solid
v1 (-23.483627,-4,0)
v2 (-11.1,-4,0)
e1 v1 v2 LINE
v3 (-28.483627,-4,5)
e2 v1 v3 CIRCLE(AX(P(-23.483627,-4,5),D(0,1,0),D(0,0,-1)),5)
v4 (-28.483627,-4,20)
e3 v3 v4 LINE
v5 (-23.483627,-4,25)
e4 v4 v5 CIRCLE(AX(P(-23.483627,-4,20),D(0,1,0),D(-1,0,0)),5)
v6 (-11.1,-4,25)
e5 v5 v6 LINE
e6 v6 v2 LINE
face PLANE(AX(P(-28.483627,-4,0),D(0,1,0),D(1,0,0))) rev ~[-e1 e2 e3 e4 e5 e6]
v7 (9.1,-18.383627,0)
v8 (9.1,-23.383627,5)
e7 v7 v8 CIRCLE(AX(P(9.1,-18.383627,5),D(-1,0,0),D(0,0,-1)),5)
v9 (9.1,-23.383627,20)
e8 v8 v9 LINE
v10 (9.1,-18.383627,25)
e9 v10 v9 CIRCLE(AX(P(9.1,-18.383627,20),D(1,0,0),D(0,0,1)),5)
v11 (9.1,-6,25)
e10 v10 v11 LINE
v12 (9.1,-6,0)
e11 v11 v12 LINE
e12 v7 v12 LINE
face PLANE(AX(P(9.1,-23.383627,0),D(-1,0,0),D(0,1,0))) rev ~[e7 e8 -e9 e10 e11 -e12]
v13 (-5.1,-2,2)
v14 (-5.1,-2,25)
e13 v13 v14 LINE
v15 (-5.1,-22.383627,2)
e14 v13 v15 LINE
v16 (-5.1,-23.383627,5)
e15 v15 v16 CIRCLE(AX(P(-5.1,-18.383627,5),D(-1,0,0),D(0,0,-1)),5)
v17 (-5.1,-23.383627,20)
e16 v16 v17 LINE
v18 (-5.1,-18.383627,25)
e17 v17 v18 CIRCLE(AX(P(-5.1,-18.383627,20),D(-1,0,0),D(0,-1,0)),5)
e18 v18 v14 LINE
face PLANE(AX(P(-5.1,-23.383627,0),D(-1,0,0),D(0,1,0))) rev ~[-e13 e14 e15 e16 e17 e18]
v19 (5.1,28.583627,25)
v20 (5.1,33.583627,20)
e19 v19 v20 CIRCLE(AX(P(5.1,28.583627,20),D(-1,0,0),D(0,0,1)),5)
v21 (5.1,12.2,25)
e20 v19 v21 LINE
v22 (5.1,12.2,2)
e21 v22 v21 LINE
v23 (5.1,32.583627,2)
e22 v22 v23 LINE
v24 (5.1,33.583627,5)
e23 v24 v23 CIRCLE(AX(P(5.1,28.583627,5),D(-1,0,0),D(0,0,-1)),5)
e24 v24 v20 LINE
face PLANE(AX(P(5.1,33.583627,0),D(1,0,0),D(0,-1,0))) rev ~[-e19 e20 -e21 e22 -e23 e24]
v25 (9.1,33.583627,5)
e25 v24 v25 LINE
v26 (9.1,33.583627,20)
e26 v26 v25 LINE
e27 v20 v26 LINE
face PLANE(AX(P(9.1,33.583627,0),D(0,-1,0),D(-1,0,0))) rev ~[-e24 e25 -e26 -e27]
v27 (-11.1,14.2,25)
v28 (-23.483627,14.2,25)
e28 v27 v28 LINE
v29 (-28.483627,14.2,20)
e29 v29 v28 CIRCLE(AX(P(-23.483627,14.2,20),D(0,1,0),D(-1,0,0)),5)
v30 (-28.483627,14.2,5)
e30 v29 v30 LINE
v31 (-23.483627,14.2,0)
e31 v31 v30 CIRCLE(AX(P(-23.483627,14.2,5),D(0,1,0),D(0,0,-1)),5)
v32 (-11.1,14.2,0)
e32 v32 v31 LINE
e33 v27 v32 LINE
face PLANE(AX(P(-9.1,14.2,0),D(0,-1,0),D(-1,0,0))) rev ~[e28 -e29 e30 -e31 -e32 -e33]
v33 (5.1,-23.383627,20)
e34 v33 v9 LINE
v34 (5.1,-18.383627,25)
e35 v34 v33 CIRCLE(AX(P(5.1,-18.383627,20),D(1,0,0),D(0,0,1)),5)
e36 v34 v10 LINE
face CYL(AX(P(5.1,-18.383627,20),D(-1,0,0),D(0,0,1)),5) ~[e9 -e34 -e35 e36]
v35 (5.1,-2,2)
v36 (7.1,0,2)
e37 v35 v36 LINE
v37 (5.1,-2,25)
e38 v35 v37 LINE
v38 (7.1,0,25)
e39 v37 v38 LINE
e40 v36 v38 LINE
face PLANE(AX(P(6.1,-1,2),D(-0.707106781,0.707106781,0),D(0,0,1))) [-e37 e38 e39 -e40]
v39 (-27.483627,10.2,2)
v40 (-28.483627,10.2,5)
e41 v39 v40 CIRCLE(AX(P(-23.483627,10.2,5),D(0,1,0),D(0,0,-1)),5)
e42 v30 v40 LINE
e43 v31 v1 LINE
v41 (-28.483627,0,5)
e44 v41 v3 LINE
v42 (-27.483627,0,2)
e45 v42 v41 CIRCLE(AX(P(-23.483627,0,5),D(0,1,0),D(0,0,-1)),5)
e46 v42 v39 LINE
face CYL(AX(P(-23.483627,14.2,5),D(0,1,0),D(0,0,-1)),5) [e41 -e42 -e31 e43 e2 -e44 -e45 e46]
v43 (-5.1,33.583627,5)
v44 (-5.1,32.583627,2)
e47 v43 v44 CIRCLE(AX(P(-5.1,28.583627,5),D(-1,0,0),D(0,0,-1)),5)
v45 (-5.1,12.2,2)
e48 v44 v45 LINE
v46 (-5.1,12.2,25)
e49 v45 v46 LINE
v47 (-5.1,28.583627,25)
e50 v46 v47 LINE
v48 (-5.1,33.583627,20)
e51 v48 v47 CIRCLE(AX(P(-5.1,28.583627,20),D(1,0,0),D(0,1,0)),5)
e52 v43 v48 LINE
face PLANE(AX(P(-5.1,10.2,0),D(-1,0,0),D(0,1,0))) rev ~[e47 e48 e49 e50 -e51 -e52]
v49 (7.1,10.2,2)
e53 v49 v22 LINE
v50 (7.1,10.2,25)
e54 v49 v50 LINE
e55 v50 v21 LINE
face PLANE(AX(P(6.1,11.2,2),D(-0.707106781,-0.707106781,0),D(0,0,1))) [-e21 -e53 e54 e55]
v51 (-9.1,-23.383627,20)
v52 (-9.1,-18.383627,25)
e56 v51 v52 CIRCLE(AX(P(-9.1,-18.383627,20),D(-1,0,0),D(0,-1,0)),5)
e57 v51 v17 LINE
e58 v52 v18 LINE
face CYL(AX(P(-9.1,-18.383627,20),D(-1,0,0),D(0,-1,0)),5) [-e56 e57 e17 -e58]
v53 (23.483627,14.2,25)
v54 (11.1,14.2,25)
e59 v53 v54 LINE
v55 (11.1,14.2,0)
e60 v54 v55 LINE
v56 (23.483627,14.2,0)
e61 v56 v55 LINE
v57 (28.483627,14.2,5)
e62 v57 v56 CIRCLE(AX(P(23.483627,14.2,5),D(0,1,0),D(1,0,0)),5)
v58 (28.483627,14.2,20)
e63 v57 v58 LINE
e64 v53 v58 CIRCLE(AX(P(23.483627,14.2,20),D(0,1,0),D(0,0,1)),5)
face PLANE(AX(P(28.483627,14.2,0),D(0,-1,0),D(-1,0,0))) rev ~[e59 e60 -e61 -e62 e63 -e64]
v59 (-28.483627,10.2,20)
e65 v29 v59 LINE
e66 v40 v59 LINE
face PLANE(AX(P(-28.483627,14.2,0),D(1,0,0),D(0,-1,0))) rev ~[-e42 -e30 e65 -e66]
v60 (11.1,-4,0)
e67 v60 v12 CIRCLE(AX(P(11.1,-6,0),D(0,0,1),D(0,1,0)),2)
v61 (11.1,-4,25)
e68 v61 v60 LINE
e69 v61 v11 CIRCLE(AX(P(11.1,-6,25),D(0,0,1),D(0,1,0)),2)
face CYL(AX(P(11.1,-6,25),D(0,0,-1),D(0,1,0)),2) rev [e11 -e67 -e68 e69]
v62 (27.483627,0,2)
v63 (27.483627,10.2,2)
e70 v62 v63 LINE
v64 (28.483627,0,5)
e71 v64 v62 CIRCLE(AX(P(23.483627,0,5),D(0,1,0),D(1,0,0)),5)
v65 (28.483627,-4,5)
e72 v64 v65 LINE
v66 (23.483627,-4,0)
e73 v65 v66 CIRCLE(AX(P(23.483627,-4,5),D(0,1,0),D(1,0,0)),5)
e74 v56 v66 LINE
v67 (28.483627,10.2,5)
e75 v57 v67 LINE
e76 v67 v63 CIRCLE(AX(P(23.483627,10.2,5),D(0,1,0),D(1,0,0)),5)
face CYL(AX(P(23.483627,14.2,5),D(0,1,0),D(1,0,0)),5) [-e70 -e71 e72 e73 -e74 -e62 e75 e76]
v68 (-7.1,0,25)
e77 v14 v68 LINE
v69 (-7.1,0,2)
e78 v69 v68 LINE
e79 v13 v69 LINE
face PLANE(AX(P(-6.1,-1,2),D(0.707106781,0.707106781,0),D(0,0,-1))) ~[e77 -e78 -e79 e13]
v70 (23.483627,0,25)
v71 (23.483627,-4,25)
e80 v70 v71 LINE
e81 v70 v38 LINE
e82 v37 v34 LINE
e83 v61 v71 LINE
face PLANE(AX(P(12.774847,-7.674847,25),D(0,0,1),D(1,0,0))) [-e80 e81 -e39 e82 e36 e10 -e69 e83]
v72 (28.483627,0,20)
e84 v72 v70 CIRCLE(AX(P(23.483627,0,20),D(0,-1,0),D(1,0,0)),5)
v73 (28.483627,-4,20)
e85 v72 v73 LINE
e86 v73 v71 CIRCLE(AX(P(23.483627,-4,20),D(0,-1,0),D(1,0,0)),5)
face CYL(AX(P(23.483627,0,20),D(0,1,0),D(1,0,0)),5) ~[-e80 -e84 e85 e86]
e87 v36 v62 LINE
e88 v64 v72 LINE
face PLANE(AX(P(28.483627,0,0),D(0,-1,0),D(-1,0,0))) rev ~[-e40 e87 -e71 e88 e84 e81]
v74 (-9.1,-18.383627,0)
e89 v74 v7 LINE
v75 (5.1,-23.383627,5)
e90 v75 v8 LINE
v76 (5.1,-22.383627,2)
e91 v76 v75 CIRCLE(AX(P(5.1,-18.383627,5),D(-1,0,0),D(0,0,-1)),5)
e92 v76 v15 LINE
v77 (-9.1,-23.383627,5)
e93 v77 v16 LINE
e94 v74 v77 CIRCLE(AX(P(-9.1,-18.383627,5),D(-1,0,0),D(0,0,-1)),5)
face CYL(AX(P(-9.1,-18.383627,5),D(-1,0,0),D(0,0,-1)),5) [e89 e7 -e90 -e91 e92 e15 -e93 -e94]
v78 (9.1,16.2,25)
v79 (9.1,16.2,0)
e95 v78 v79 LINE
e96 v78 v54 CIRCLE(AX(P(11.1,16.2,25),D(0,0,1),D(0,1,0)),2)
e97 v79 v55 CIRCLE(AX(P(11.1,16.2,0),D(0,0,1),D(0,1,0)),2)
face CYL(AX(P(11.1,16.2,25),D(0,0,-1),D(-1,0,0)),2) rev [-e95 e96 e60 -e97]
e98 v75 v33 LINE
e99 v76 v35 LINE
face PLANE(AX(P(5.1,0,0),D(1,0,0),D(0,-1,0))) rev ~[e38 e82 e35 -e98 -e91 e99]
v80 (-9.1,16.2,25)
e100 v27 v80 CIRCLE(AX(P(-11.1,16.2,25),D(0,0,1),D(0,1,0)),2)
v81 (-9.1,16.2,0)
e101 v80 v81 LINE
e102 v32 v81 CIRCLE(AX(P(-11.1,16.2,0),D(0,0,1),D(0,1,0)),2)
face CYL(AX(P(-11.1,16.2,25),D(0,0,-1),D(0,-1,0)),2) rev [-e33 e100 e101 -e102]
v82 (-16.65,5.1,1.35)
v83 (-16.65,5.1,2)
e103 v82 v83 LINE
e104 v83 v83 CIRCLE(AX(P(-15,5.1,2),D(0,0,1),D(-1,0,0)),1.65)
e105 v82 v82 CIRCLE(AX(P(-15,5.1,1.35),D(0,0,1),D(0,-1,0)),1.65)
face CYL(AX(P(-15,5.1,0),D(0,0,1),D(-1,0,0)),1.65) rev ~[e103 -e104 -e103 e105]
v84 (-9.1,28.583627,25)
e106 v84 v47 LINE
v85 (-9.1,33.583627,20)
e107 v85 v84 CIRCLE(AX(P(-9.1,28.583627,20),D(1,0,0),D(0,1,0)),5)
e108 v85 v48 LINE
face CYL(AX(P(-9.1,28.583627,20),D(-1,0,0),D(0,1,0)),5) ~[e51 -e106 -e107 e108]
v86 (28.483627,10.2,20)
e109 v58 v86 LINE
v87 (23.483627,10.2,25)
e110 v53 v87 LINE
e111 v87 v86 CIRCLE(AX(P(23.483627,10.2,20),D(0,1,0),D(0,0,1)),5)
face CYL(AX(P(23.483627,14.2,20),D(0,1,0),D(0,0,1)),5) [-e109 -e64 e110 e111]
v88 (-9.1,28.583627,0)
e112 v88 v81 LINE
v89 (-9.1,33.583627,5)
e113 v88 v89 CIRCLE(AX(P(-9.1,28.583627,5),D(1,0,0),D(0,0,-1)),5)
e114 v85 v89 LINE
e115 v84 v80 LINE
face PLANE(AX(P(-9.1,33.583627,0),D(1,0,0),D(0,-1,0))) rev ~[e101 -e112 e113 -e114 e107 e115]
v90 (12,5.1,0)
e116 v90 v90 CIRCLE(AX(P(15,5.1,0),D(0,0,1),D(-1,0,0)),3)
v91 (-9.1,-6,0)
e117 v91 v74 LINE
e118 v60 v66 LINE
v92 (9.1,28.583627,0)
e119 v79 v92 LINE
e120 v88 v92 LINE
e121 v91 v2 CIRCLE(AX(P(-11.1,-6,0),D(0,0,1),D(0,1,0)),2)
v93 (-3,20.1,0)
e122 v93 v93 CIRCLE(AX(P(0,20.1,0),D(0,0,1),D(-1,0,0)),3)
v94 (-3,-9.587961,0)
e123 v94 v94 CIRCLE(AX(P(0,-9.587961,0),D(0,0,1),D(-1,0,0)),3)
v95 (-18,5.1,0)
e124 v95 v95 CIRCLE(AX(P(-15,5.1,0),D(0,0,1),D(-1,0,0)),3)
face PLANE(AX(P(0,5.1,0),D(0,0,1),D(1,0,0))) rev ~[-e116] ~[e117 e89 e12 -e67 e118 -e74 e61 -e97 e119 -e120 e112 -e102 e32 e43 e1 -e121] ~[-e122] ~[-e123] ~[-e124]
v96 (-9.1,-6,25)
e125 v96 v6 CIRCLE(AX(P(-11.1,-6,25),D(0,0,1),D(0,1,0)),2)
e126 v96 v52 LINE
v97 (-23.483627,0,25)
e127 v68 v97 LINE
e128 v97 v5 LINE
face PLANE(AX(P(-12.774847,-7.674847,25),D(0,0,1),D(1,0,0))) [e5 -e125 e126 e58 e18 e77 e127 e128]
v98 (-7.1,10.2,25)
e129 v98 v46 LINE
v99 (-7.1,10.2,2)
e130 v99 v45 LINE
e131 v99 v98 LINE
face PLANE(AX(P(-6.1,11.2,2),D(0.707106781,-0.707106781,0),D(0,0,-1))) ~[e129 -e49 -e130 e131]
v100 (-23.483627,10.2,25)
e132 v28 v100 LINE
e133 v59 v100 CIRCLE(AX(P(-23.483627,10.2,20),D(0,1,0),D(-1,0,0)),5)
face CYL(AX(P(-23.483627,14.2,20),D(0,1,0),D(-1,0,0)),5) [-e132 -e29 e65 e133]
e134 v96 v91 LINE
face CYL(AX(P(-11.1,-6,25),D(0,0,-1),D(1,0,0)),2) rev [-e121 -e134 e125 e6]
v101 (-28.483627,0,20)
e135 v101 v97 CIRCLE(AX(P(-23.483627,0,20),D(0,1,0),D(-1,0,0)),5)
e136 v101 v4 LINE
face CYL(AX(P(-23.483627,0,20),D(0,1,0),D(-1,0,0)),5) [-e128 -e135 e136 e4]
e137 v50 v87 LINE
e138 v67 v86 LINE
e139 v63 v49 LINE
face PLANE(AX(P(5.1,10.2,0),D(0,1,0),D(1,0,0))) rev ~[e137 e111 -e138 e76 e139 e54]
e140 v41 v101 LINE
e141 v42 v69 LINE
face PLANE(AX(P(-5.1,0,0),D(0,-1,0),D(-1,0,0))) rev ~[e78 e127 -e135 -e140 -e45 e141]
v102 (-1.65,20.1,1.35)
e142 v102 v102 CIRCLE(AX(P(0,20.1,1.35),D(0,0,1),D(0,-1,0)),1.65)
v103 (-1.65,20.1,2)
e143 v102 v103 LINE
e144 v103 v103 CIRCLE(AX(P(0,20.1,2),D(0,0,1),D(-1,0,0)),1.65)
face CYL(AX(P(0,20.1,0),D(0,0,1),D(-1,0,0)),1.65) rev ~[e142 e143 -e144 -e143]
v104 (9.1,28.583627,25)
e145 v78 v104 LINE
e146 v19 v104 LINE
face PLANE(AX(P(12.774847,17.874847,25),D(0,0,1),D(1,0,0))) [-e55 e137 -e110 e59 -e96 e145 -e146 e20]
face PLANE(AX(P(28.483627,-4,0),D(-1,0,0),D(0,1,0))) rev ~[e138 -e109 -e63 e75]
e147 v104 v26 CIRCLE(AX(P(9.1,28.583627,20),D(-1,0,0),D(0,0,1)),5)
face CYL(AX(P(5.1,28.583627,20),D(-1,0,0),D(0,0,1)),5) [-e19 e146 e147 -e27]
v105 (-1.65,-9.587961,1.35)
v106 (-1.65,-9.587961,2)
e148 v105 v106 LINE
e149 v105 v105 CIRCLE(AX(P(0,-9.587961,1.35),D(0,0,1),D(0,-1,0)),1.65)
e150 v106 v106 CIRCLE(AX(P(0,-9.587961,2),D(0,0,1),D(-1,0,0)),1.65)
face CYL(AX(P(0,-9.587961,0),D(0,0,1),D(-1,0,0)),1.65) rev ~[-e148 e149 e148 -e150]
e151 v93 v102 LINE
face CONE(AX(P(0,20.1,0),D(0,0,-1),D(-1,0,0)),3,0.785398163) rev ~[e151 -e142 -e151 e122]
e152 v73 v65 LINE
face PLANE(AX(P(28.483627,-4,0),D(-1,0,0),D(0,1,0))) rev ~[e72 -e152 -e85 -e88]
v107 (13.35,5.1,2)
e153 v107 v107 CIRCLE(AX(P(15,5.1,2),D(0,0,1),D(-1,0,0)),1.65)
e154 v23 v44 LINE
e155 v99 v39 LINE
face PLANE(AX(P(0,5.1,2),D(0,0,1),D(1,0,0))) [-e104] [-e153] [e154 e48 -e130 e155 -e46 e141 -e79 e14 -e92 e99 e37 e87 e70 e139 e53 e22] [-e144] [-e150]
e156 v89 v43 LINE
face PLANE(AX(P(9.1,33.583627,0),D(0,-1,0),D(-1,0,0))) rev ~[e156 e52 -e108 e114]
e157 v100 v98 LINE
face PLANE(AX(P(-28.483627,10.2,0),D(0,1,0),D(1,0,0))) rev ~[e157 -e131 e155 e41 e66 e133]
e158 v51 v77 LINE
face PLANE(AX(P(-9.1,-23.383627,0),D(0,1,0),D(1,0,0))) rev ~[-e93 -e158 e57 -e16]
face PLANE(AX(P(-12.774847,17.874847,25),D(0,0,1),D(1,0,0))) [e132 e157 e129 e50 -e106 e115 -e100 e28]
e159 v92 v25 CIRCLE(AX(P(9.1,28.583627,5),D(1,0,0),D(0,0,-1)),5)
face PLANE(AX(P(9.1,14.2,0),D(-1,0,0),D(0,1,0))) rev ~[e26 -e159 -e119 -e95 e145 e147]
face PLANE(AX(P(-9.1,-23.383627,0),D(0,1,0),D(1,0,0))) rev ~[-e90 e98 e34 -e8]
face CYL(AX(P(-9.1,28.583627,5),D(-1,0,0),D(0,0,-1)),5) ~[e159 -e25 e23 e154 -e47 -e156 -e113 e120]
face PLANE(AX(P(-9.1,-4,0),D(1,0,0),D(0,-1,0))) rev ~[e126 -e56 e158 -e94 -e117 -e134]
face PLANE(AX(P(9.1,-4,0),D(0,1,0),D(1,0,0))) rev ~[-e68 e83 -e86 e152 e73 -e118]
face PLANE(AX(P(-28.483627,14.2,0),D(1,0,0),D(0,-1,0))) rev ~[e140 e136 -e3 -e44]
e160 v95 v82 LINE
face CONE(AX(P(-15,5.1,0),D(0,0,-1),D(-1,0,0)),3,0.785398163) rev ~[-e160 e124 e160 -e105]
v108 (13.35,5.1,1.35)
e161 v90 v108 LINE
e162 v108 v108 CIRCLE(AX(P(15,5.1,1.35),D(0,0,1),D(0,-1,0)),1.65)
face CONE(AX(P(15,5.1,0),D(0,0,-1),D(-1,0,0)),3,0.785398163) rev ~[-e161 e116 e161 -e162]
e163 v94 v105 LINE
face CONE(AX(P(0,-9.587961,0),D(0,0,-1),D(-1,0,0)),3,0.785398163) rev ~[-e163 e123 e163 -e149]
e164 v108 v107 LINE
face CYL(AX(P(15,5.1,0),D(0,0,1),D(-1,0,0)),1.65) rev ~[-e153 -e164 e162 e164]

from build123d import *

# Parameters (mm, degrees)
F1_DEPTH       = 2
F2_DEPTH       = 25
F3_R           = 2
F4_T1_DEPTH    = 4
F4_T3_DEPTH    = 4
F4_T5_DEPTH    = 4
F4_T7_DEPTH    = 18.2
F4_T9_DEPTH    = 18.2
F4_T11_DEPTH   = 4
F5_R           = 2
F6_SIZE        = 2
F8_D           = 3.3
F8_CSINK_D     = 6
F8_CSINK_ANGLE = 90


# Not quite as in the source:
# - a fillet or chamfer that OpenCascade refuses, or shapes differently, is made with other operations: its cross-section is extruded or revolved along the edge and cut away or added
# - a feature names something its author has since deleted; it is built from what else it names


with BuildPart() as f1:
    # F0 (on Top) → F1 (new body)
    with BuildSketch(Plane.XY):
        Polygon((28.4836267311, 0), (28.4836267311, 10.2), (5.1, 10.2), (5.1, 33.5836267311), (-5.1, 33.5836267311), (-5.1, 10.2), (-28.4836267311, 10.2), (-28.4836267311, 0), (-5.1, 0), (-5.1, -23.3836267311), (5.1, -23.3836267311), (5.1, 0), align=None)
        Polygon((5.1, 10.2), (28.4836267311, 10.2), (28.4836267311, 14.2), (9.1, 14.2), (9.1, 33.5836267311), (5.1, 33.5836267311), align=None)
        Polygon((28.4836267311, -4), (28.4836267311, 0), (5.1, 0), (5.1, -23.3836267311), (9.1, -23.3836267311), (9.1, -4), align=None)
        Polygon((-5.1, 10.2), (-5.1, 33.5836267311), (-9.1, 33.5836267311), (-9.1, 14.2), (-28.4836267311, 14.2), (-28.4836267311, 10.2), align=None)
        Polygon((-9.1, -23.3836267311), (-5.1, -23.3836267311), (-5.1, 0), (-28.4836267311, 0), (-28.4836267311, -4), (-9.1, -4), align=None)
    extrude(amount=F1_DEPTH)

    # F0 (on Top) → F2 (join)
    with BuildSketch(Plane.XY):
        Polygon((-5.1, 10.2), (-5.1, 33.5836267311), (-9.1, 33.5836267311), (-9.1, 14.2), (-28.4836267311, 14.2), (-28.4836267311, 10.2), align=None)
        Polygon((5.1, 10.2), (28.4836267311, 10.2), (28.4836267311, 14.2), (9.1, 14.2), (9.1, 33.5836267311), (5.1, 33.5836267311), align=None)
        Polygon((-9.1, -23.3836267311), (-5.1, -23.3836267311), (-5.1, 0), (-28.4836267311, 0), (-28.4836267311, -4), (-9.1, -4), align=None)
        Polygon((28.4836267311, -4), (28.4836267311, 0), (5.1, 0), (5.1, -23.3836267311), (9.1, -23.3836267311), (9.1, -4), align=None)
    extrude(amount=F2_DEPTH)

    # F3
    f3_edges = [f1.edges().sort_by_distance(p)[0] for p in [
        (9.1, 14.2, 12.5),
        (9.1, -4, 12.5),
    ]]
    fillet(f3_edges, radius=F3_R)

    # F4: fillet of radius 5 on 12 edges, made by hand

    # F4_s2 → F4_t1 (cut)
    with BuildSketch(Plane.XZ.offset(-14.2)):
        with BuildLine():
            ThreePointArc((23.4836267311, 25), (27.0191606371, 23.5355339059), (28.4836267311, 20))
            Line((28.4836267311, 20), (28.5836267311, 20))
            Line((28.5836267311, 20), (28.5836267311, 25.1))
            Line((28.5836267311, 25.1), (23.4836267311, 25.1))
            Line((23.4836267311, 25.1), (23.4836267311, 25))
        make_face()
        with BuildLine():
            ThreePointArc((-28.4836267311, 20), (-27.0191606371, 23.5355339059), (-23.4836267311, 25))
            Line((-23.4836267311, 25), (-23.4836267311, 25.1))
            Line((-23.4836267311, 25.1), (-28.5836267311, 25.1))
            Line((-28.5836267311, 25.1), (-28.5836267311, 20))
            Line((-28.5836267311, 20), (-28.4836267311, 20))
        make_face()
    extrude(amount=F4_T1_DEPTH, mode=Mode.SUBTRACT)

    # F4_s4 → F4_t3 (cut)
    with BuildSketch(Plane.YZ.offset(-9.1)):
        with BuildLine():
            ThreePointArc((33.5836267311, 20), (32.1191606371, 23.5355339059), (28.5836267311, 25))
            Line((28.5836267311, 25), (28.5836267311, 25.1))
            Line((28.5836267311, 25.1), (33.6836267311, 25.1))
            Line((33.6836267311, 25.1), (33.6836267311, 20))
            Line((33.6836267311, 20), (33.5836267311, 20))
        make_face()
        with BuildLine():
            ThreePointArc((-23.3836267311, 20), (-21.9191606371, 23.5355339059), (-18.3836267311, 25))
            Line((-18.3836267311, 25), (-18.3836267311, 25.1))
            Line((-18.3836267311, 25.1), (-23.4836267311, 25.1))
            Line((-23.4836267311, 25.1), (-23.4836267311, 20))
            Line((-23.4836267311, 20), (-23.3836267311, 20))
        make_face()
    extrude(amount=F4_T3_DEPTH, mode=Mode.SUBTRACT)

    # F4_s6 → F4_t5 (cut)
    with BuildSketch(Plane.YZ.offset(5.1)):
        with BuildLine():
            ThreePointArc((28.5836267311, 25), (32.1191606371, 23.5355339059), (33.5836267311, 20))
            Line((33.5836267311, 20), (33.6836267311, 20))
            Line((33.6836267311, 20), (33.6836267311, 25.1))
            Line((33.6836267311, 25.1), (28.5836267311, 25.1))
            Line((28.5836267311, 25.1), (28.5836267311, 25))
        make_face()
        with BuildLine():
            ThreePointArc((-18.3836267311, 25), (-21.9191606371, 23.5355339059), (-23.3836267311, 20))
            Line((-23.3836267311, 20), (-23.4836267311, 20))
            Line((-23.4836267311, 20), (-23.4836267311, 25.1))
            Line((-23.4836267311, 25.1), (-18.3836267311, 25.1))
            Line((-18.3836267311, 25.1), (-18.3836267311, 25))
        make_face()
    extrude(amount=F4_T5_DEPTH, mode=Mode.SUBTRACT)

    # F4_s8 → F4_t7 (cut)
    with BuildSketch(Plane.XZ.offset(-14.2)):
        with BuildLine():
            ThreePointArc((-23.4836267311, 0), (-27.0191606371, 1.4644660941), (-28.4836267311, 5))
            Line((-28.4836267311, 5), (-28.5836267311, 5))
            Line((-28.5836267311, 5), (-28.5836267311, -0.1))
            Line((-28.5836267311, -0.1), (-23.4836267311, -0.1))
            Line((-23.4836267311, -0.1), (-23.4836267311, 0))
        make_face()
        with BuildLine():
            ThreePointArc((28.4836267311, 5), (27.0191606371, 1.4644660941), (23.4836267311, 0))
            Line((23.4836267311, 0), (23.4836267311, -0.1))
            Line((23.4836267311, -0.1), (28.5836267311, -0.1))
            Line((28.5836267311, -0.1), (28.5836267311, 5))
            Line((28.5836267311, 5), (28.4836267311, 5))
        make_face()
    extrude(amount=F4_T7_DEPTH, mode=Mode.SUBTRACT)

    # F4_s10 → F4_t9 (cut)
    with BuildSketch(Plane.YZ.offset(-9.1)):
        with BuildLine():
            ThreePointArc((28.5836267311, 0), (32.1191606371, 1.4644660941), (33.5836267311, 5))
            Line((33.5836267311, 5), (33.6836267311, 5))
            Line((33.6836267311, 5), (33.6836267311, -0.1))
            Line((33.6836267311, -0.1), (28.5836267311, -0.1))
            Line((28.5836267311, -0.1), (28.5836267311, 0))
        make_face()
        with BuildLine():
            ThreePointArc((-18.3836267311, 0), (-21.9191606371, 1.4644660941), (-23.3836267311, 5))
            Line((-23.3836267311, 5), (-23.4836267311, 5))
            Line((-23.4836267311, 5), (-23.4836267311, -0.1))
            Line((-23.4836267311, -0.1), (-18.3836267311, -0.1))
            Line((-18.3836267311, -0.1), (-18.3836267311, 0))
        make_face()
    extrude(amount=F4_T9_DEPTH, mode=Mode.SUBTRACT)

    # F4_s12 → F4_t11 (cut)
    with BuildSketch(Plane.XZ):
        with BuildLine():
            ThreePointArc((28.4836267311, 20), (27.0191606371, 23.5355339059), (23.4836267311, 25))
            Line((23.4836267311, 25), (23.4836267311, 25.1))
            Line((23.4836267311, 25.1), (28.5836267311, 25.1))
            Line((28.5836267311, 25.1), (28.5836267311, 20))
            Line((28.5836267311, 20), (28.4836267311, 20))
        make_face()
        with BuildLine():
            ThreePointArc((-28.4836267311, 20), (-27.0191606371, 23.5355339059), (-23.4836267311, 25))
            Line((-23.4836267311, 25), (-23.4836267311, 25.1))
            Line((-23.4836267311, 25.1), (-28.5836267311, 25.1))
            Line((-28.5836267311, 25.1), (-28.5836267311, 20))
            Line((-28.5836267311, 20), (-28.4836267311, 20))
        make_face()
    extrude(amount=F4_T11_DEPTH, mode=Mode.SUBTRACT)

    # F5
    f5_edges = [f1.edges().sort_by_distance(p)[0] for p in [
        (-9.1, 14.2, 12.5),
        (-9.1, -4, 12.5),
    ]]
    fillet(f5_edges, radius=F5_R)

    # F6
    f6_edges = [f1.edges().sort_by_distance(p)[0] for p in [
        (5.1, 10.2, 13.5),
        (-5.1, 10.2, 13.5),
        (5.1, 0, 13.5),
        (-5.1, 0, 13.5),
    ]]
    chamfer(f6_edges, length=F6_SIZE)

    # F8 (through all)
    with Locations(Plane(origin=(0, 0, 0), x_dir=(1, 0, 0), z_dir=(0, 0, -1))):
        with Locations((0, 9.587961331), (-15, -5.1), (15, -5.1), (0, -20.1)):
            CounterSinkHole(F8_D / 2, F8_CSINK_D / 2, counter_sink_angle=F8_CSINK_ANGLE)


solid = f1.part
